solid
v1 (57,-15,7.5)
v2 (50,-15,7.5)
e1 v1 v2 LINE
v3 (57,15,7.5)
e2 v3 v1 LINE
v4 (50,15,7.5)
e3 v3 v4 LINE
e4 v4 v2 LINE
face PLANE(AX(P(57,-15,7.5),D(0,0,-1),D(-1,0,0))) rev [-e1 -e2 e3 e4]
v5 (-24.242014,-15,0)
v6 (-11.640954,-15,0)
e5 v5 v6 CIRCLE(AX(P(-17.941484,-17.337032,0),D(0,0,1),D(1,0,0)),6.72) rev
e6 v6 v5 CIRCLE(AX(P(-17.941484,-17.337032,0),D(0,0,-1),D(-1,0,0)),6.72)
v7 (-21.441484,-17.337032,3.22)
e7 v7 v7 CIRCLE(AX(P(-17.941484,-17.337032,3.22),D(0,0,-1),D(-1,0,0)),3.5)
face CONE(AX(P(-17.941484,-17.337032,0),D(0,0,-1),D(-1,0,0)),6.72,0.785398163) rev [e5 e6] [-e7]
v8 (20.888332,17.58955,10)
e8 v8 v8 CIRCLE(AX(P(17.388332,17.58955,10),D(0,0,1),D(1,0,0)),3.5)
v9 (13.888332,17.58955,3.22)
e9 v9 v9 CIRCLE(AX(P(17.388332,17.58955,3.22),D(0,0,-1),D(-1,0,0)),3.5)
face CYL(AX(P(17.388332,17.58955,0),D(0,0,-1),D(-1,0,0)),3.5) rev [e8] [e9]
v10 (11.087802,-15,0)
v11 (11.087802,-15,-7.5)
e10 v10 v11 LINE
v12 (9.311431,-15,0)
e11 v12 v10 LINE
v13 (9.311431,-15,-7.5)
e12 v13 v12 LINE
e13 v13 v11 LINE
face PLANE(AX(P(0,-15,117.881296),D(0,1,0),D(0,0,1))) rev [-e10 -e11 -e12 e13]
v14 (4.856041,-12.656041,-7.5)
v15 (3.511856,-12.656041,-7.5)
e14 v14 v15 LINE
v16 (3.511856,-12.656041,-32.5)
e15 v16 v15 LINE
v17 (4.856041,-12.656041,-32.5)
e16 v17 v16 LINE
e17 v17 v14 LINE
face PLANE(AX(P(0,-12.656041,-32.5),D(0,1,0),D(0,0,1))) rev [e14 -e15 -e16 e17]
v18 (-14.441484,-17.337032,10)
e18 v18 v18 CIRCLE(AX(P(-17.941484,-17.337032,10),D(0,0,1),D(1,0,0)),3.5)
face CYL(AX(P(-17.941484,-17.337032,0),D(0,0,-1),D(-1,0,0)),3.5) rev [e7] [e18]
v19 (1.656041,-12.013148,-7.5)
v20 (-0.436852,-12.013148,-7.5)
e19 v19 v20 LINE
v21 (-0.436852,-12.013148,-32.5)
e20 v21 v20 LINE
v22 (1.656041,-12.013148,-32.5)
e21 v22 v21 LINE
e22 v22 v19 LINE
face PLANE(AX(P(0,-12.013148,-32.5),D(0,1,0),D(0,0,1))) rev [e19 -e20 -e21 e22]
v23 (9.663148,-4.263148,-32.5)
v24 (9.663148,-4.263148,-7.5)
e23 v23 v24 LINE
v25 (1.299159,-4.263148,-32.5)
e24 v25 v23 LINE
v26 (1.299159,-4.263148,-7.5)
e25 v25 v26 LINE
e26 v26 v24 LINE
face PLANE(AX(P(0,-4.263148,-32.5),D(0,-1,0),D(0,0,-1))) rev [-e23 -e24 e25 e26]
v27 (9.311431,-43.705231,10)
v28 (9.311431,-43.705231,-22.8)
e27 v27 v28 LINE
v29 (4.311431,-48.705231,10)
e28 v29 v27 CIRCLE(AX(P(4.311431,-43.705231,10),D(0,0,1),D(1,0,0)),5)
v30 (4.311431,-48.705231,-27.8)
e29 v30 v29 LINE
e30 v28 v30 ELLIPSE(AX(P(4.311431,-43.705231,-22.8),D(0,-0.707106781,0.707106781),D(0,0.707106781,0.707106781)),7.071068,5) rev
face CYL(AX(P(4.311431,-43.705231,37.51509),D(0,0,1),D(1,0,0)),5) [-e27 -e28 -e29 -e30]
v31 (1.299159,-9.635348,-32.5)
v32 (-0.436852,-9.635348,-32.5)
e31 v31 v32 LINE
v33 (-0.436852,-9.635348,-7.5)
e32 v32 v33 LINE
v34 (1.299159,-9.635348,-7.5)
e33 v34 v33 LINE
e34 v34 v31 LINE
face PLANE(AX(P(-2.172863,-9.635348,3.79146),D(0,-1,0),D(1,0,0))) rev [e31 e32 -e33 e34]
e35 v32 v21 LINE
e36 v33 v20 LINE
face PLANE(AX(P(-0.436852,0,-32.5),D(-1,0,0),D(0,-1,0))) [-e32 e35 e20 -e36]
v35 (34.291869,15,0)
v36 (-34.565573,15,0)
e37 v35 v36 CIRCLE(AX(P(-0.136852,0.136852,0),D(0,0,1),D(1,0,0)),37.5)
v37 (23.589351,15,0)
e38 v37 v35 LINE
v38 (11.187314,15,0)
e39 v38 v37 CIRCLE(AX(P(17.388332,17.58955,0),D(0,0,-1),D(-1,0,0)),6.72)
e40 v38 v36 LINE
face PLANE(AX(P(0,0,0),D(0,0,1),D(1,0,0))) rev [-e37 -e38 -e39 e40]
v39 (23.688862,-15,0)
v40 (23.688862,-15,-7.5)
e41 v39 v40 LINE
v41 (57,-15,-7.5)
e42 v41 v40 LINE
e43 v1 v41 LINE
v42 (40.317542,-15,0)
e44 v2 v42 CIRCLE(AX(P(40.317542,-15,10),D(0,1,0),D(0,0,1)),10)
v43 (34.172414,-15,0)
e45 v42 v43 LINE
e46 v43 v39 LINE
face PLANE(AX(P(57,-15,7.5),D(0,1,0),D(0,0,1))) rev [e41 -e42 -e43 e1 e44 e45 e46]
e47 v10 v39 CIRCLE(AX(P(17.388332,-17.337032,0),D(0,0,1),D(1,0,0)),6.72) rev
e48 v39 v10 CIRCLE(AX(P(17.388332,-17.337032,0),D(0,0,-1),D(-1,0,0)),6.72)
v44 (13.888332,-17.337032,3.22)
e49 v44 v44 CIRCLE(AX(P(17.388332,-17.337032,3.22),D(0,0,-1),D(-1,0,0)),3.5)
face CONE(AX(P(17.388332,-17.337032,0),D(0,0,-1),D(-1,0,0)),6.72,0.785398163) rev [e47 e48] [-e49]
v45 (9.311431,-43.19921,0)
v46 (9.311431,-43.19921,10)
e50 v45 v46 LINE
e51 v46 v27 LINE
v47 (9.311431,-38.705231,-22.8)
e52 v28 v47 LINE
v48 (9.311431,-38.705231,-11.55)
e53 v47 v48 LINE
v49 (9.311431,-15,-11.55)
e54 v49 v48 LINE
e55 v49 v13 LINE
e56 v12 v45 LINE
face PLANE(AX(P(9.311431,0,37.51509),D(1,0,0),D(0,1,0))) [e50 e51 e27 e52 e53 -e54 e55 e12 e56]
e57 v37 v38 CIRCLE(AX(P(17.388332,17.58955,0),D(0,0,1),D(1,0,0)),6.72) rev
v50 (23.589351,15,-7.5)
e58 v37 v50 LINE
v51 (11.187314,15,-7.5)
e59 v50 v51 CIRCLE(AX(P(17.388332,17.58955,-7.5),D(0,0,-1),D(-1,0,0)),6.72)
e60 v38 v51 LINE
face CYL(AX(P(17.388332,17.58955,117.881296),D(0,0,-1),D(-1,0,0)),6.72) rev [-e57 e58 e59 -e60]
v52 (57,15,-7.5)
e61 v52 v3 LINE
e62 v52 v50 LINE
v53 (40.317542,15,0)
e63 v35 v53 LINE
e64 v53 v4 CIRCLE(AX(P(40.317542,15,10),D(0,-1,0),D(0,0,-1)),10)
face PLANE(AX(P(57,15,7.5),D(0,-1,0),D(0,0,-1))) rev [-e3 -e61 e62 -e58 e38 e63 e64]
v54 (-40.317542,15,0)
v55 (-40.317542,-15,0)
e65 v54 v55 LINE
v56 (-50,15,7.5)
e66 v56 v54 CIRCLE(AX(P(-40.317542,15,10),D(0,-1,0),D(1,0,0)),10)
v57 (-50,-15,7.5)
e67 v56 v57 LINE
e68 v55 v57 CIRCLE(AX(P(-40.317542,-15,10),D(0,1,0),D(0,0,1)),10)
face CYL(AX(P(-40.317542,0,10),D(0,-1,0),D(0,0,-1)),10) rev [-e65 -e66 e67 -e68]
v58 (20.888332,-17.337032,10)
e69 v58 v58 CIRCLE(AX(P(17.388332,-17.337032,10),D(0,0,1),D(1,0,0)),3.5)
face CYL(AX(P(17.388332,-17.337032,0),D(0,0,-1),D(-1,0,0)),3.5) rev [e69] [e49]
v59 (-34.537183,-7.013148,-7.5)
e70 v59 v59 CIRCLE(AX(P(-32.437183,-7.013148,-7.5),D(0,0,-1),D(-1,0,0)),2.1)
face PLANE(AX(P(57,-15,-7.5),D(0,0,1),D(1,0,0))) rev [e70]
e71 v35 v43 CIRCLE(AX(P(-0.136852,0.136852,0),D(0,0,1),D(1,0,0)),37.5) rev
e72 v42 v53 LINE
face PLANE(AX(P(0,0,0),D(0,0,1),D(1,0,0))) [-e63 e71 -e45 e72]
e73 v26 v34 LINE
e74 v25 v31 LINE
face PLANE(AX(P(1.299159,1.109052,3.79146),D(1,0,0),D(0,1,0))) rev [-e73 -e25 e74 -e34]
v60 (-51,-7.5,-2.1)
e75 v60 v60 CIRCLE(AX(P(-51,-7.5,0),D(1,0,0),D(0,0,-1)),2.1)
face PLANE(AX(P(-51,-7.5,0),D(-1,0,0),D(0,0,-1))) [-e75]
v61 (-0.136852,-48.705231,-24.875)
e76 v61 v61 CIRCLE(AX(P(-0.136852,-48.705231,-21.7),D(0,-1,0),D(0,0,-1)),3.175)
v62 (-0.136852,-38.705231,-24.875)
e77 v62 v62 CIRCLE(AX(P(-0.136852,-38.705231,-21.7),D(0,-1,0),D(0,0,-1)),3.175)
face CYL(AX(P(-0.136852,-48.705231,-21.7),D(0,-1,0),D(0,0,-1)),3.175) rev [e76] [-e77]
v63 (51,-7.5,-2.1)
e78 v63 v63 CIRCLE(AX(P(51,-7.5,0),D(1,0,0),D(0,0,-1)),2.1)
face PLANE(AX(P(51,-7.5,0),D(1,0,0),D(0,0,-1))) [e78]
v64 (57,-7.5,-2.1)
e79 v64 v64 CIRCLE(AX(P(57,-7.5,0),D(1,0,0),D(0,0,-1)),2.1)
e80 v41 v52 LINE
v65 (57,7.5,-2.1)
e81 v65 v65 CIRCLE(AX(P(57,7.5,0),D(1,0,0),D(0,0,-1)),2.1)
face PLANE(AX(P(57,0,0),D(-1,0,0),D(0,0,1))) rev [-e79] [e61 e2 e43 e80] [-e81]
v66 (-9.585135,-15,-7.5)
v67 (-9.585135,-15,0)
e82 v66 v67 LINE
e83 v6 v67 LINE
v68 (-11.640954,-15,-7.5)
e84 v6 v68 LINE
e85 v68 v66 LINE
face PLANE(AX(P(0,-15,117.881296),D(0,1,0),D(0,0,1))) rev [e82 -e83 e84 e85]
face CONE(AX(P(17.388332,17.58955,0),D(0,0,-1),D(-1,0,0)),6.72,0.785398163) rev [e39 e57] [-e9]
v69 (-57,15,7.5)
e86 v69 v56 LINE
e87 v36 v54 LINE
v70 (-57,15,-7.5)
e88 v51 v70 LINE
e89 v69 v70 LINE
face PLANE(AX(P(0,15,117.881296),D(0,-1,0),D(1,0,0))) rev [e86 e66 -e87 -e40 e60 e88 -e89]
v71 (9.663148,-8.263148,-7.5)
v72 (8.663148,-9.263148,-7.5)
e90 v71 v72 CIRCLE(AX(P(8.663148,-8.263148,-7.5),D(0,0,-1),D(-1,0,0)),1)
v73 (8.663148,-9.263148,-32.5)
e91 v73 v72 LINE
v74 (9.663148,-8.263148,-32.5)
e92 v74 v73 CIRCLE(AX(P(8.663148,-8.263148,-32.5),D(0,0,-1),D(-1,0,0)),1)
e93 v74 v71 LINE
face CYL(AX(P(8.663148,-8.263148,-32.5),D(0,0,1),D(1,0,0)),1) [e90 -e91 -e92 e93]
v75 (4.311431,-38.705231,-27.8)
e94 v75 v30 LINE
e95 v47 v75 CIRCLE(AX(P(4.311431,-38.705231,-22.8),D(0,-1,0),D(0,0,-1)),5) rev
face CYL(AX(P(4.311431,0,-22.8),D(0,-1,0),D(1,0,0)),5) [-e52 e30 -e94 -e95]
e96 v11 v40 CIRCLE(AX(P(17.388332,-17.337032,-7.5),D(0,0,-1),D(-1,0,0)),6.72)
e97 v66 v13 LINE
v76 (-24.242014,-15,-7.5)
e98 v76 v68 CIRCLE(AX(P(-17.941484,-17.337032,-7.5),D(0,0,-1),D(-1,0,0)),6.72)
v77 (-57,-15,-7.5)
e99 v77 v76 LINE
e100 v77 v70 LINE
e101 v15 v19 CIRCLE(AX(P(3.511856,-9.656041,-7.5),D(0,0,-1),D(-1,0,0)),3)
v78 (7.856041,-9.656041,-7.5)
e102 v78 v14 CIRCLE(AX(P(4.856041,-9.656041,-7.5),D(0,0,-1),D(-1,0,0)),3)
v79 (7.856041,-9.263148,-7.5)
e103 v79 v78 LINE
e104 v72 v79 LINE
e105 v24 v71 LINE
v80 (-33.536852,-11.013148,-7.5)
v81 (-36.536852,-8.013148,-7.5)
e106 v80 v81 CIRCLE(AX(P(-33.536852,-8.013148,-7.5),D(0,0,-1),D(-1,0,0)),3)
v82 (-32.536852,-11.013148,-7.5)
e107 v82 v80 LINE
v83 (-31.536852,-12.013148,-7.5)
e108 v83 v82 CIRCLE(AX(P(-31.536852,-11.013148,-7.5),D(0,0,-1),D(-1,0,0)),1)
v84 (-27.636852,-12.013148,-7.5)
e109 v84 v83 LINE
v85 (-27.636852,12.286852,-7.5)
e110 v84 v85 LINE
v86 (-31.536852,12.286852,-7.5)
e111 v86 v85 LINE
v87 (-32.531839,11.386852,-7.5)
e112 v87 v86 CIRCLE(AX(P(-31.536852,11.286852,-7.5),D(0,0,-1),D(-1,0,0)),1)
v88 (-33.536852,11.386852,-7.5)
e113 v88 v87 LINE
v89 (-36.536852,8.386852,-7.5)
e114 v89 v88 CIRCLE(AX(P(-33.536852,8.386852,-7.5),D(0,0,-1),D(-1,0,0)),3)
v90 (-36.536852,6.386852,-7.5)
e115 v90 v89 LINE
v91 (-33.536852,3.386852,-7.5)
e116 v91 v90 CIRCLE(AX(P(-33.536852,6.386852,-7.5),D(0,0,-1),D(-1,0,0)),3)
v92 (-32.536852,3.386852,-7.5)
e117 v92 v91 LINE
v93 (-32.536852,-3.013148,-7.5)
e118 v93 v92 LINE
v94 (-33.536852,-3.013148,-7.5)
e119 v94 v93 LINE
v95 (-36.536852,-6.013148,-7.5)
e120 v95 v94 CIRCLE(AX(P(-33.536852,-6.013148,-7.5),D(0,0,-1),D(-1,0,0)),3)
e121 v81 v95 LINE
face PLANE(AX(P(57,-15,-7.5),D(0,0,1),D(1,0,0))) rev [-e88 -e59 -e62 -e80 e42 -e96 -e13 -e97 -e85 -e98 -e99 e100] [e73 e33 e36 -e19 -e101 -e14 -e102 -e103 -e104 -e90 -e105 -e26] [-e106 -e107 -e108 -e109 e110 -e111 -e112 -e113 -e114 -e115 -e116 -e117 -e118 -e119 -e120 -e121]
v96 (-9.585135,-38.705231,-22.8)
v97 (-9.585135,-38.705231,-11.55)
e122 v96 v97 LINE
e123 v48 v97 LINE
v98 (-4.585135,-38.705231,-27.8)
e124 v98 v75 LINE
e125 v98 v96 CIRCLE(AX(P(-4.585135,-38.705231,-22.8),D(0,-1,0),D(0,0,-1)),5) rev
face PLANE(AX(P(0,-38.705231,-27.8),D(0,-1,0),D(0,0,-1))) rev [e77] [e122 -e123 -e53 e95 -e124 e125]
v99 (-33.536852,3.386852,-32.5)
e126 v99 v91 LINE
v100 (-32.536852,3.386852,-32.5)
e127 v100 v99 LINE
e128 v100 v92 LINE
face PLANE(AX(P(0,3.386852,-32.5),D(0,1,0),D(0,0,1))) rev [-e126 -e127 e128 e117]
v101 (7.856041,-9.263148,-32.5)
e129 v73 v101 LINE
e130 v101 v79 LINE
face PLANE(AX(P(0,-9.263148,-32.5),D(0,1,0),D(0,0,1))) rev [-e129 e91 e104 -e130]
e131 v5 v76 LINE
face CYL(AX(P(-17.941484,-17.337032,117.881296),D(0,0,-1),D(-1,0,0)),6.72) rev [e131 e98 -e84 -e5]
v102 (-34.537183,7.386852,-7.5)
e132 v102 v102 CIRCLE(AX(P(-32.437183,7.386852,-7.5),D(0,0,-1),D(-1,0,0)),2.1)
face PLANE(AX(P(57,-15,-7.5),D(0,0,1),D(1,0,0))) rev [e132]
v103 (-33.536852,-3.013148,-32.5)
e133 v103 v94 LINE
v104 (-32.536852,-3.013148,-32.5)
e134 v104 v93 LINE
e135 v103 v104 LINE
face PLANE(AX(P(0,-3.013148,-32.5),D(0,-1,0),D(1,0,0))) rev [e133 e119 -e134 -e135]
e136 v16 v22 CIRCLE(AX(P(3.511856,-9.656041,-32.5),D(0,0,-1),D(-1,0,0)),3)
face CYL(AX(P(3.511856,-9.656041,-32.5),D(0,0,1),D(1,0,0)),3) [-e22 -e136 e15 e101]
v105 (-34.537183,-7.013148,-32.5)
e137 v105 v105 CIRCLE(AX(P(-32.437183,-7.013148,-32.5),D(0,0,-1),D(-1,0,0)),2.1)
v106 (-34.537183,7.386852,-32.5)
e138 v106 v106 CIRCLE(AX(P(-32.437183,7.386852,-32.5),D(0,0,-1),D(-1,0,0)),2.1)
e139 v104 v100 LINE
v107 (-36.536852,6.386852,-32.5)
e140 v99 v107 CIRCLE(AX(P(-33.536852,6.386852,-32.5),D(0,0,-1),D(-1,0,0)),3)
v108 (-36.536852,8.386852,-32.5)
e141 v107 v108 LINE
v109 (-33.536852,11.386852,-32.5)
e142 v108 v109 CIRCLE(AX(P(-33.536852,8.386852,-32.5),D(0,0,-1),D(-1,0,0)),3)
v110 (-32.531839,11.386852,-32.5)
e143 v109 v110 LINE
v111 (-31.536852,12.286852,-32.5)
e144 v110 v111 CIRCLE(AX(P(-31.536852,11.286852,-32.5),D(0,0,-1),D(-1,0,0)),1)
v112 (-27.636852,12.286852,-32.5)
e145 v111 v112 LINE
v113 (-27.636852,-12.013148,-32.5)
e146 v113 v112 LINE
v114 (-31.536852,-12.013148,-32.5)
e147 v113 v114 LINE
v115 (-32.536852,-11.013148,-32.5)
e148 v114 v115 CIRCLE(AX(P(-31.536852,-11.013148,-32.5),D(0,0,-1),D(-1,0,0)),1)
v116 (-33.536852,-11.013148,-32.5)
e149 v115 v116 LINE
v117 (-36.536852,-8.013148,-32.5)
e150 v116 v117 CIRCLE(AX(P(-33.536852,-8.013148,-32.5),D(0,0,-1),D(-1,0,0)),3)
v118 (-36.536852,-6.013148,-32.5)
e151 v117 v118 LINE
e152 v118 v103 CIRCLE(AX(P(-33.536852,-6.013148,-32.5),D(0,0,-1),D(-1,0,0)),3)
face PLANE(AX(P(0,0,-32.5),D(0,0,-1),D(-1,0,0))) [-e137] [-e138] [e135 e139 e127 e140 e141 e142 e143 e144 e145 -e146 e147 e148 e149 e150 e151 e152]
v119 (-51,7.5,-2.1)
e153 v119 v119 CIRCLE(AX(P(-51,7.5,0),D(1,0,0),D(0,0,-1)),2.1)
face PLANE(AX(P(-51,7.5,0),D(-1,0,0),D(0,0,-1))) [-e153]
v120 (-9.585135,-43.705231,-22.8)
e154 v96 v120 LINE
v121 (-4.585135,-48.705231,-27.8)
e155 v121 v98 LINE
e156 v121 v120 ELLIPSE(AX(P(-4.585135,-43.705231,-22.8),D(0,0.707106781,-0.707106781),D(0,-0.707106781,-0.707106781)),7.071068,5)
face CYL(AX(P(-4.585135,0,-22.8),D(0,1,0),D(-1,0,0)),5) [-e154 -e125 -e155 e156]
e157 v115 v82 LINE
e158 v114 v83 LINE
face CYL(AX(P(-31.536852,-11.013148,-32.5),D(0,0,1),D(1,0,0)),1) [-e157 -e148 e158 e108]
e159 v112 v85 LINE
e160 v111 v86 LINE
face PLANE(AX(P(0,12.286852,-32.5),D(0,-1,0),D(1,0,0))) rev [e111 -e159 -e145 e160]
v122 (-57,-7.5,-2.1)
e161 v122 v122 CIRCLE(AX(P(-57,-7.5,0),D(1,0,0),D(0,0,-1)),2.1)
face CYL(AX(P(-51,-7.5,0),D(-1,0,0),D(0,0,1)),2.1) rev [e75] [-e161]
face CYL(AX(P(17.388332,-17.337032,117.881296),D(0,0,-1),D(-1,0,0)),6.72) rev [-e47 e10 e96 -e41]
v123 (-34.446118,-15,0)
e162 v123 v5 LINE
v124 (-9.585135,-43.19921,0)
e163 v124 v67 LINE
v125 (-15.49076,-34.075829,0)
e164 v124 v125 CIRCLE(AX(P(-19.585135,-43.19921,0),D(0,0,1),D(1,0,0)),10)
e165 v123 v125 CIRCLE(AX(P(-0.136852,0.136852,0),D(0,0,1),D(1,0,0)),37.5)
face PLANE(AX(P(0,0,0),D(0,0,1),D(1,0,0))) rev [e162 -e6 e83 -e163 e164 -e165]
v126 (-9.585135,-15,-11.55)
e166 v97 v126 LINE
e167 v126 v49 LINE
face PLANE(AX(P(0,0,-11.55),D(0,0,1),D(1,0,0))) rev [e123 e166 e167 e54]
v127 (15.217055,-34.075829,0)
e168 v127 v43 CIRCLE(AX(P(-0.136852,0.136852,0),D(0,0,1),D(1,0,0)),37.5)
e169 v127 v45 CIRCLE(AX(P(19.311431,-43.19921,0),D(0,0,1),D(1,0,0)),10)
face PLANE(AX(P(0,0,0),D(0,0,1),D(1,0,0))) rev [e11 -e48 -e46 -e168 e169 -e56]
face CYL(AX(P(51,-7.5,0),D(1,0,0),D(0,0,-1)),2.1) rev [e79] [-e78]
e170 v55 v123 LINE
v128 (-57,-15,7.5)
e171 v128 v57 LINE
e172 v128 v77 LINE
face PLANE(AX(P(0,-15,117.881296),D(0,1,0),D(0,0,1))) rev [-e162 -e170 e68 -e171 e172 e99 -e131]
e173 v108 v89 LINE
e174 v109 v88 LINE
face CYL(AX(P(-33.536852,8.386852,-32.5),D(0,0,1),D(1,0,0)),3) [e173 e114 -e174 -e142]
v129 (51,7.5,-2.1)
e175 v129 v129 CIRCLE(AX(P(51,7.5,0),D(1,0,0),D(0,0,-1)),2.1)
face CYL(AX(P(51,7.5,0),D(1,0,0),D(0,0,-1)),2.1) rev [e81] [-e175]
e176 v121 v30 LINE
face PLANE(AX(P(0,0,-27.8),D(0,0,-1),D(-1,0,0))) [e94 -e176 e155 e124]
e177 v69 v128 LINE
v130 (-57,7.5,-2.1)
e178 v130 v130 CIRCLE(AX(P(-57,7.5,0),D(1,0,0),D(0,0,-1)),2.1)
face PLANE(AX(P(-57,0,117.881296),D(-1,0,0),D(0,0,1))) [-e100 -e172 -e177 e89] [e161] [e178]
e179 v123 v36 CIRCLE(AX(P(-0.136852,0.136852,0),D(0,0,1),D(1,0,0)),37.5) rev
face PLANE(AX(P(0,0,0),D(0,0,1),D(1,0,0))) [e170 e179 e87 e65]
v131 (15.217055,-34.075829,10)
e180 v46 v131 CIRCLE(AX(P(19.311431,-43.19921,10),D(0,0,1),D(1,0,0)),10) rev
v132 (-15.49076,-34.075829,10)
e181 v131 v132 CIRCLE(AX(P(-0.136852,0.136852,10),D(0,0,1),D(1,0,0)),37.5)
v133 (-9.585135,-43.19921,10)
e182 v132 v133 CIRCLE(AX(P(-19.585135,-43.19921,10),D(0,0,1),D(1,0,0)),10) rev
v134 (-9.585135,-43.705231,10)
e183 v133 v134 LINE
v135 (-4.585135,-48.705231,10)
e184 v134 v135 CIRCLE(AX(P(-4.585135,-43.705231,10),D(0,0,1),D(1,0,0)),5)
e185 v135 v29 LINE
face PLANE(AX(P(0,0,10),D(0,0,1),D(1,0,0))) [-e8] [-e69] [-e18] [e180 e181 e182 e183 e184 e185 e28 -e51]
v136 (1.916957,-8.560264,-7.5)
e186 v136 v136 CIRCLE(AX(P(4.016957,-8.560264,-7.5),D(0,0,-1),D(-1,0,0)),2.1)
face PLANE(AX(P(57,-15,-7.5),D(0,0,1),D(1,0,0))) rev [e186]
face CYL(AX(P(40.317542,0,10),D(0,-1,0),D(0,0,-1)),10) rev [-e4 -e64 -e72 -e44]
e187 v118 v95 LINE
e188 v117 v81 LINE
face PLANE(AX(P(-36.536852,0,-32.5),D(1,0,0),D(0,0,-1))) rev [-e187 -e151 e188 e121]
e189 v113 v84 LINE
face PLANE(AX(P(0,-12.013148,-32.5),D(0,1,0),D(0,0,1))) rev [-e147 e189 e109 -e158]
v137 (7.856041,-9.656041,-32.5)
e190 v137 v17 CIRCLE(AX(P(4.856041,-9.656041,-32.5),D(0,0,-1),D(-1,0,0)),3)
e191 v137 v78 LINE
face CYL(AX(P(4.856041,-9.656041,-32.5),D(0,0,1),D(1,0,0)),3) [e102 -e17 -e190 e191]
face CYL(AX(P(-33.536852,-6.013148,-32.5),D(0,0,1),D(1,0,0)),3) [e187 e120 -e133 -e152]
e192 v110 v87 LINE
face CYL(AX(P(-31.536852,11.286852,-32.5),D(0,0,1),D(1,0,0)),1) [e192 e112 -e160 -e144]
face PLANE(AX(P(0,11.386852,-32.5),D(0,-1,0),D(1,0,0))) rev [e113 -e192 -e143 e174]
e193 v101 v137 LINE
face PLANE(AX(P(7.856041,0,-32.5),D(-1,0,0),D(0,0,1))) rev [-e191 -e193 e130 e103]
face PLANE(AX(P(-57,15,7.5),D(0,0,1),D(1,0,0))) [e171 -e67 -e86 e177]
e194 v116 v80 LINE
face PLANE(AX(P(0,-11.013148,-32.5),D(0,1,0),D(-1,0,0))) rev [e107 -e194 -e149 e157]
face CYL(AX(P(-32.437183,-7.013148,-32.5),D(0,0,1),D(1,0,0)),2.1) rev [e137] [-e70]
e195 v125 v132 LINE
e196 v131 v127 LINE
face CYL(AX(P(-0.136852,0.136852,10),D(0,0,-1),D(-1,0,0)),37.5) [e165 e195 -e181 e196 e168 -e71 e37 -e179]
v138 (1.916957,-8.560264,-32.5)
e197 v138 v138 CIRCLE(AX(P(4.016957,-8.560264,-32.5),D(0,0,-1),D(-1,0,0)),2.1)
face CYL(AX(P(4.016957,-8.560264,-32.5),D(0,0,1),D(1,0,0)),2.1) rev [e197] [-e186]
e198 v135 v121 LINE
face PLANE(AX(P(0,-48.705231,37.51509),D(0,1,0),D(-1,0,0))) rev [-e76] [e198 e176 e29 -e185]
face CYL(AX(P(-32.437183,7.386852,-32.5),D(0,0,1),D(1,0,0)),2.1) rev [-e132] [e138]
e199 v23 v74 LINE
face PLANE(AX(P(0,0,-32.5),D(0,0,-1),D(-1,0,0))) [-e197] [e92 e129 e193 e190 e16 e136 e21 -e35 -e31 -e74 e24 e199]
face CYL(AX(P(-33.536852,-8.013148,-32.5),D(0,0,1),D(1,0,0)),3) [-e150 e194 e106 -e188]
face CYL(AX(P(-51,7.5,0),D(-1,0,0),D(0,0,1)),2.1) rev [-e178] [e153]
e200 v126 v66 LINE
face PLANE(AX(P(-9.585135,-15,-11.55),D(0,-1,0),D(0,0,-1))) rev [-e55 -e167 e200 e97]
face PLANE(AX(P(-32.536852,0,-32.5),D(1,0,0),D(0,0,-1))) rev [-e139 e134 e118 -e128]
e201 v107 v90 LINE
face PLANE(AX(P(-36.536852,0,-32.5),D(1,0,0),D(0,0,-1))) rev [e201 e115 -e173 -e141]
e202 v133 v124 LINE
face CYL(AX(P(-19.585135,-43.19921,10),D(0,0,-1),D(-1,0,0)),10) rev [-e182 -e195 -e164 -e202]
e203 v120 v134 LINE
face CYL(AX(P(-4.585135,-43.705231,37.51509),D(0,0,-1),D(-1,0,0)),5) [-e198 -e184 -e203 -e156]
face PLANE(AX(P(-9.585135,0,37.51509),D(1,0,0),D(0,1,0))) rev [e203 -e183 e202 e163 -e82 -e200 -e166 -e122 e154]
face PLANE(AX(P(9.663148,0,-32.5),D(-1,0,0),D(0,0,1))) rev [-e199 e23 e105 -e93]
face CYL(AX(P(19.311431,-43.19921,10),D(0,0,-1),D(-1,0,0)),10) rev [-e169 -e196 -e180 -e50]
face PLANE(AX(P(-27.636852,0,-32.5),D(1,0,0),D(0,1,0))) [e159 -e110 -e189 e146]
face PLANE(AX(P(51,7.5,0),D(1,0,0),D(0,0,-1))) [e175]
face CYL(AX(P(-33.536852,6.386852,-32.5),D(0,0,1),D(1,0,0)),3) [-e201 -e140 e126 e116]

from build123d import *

# Parameters (mm, degrees)
SKETCH1_R                                            = 37.5
BOSS_EXTRUDE1_DEPTH                                  = 10
CSK_FOR_M6_HEX_SOCKET_COUNTERSUNK_CAP_SC_D           = 7
CSK_FOR_M6_HEX_SOCKET_COUNTERSUNK_CAP_SC_DEPTH       = 14.44
CSK_FOR_M6_HEX_SOCKET_COUNTERSUNK_CAP_SC_CSINK_D     = 13.44
CSK_FOR_M6_HEX_SOCKET_COUNTERSUNK_CAP_SC_CSINK_ANGLE = 90
CSK_FOR_M6_HEX_SOCKET_COUNTERSUNK_CAP_SC_TIP         = 2.103012167
SKETCH6_W                                            = 15
SKETCH6_H                                            = 30
BOSS_EXTRUDE2_DEPTH                                  = 7
SKETCH7_W                                            = 15
SKETCH7_H                                            = 30
BOSS_EXTRUDE3_DEPTH                                  = 7
BOSS_EXTRUDE4_START                                  = -7.5
BOSS_EXTRUDE4_DEPTH                                  = 7.5
FILLET1_R                                            = 10
SKETCH9_R                                            = 2.1
CUT_EXTRUDE1_DEPTH                                   = 6
SKETCH11_R                                           = 2.1
BOSS_EXTRUDE5_DEPTH                                  = 25
SKETCH12_W                                           = 3.472021997
SKETCH12_H                                           = 10.744400241
CUT_EXTRUDE2_DEPTH                                   = 25
BOSS_EXTRUDE7_DEPTH                                  = 10
SKETCH15_4_W                                         = 18.896565648
SKETCH15_4_H                                         = 10
BOSS_EXTRUDE8_DEPTH                                  = 27.8
F_1_4_0_25_DIAMETER_HOLE2_D                          = 6.35
F_1_4_0_25_DIAMETER_HOLE2_DEPTH                      = 15
F_1_4_0_25_DIAMETER_HOLE2_TIP                        = 1.907732465
SKETCH24_W                                           = 18.896565648
SKETCH24_H                                           = 23.705231447
BOSS_EXTRUDE9_DEPTH                                  = 11.55
FILLET2_R                                            = 10
FILLET4_R                                            = 5


with BuildPart() as part:
    # Sketch1 → Boss-Extrude1 (new body)
    with BuildSketch(Plane.XY):
        with Locations((-0.136852044, 0.136852044)):
            Circle(SKETCH1_R)
    extrude(amount=BOSS_EXTRUDE1_DEPTH)

    # CSK for M6 Hex Socket Countersunk Cap Screw1
    with Locations(Plane(origin=(0, 0, 0), x_dir=(-1, 0, 0), z_dir=(0, 0, -1))):
        with Locations((-17.388332087, 17.58954996), (-17.388332087, -17.337031875), (17.941484165, -17.337031875)):
            CounterSinkHole(CSK_FOR_M6_HEX_SOCKET_COUNTERSUNK_CAP_SC_D / 2, CSK_FOR_M6_HEX_SOCKET_COUNTERSUNK_CAP_SC_CSINK_D / 2, depth=CSK_FOR_M6_HEX_SOCKET_COUNTERSUNK_CAP_SC_DEPTH, counter_sink_angle=CSK_FOR_M6_HEX_SOCKET_COUNTERSUNK_CAP_SC_CSINK_ANGLE)
            with Locations((0, 0, -(CSK_FOR_M6_HEX_SOCKET_COUNTERSUNK_CAP_SC_DEPTH + CSK_FOR_M6_HEX_SOCKET_COUNTERSUNK_CAP_SC_TIP / 2))):  # 118° drill point
                Cone(0, CSK_FOR_M6_HEX_SOCKET_COUNTERSUNK_CAP_SC_D / 2, CSK_FOR_M6_HEX_SOCKET_COUNTERSUNK_CAP_SC_TIP, mode=Mode.SUBTRACT)



with BuildPart() as body_2:
    # Sketch6 → Boss-Extrude2 (new body)
    with BuildSketch(Plane(origin=(50, 0, 0), x_dir=(0, 0, -1), z_dir=(1, 0, 0))):
        Rectangle(SKETCH6_W, SKETCH6_H)
    extrude(amount=BOSS_EXTRUDE2_DEPTH)


with BuildPart() as body_3:
    # Sketch7 → Boss-Extrude3 (new body)
    with BuildSketch(Plane(origin=(-50, 0, 0), x_dir=(0, 0, -1), z_dir=(1, 0, 0))):
        Rectangle(SKETCH7_W, SKETCH7_H)
    extrude(amount=-BOSS_EXTRUDE3_DEPTH)


with BuildPart() as part_1:
    add(part.part)

    add(body_2.part)  # Boss-Extrude4 merges body 2

    add(body_3.part)  # Boss-Extrude4 merges body 3
    # Sketch8 → Boss-Extrude4 (add)
    with BuildSketch(Plane(origin=(0, 0, -7.5), x_dir=(-1, 0, 0), z_dir=(0, 0, -1)).offset(BOSS_EXTRUDE4_START)):
        with BuildLine():
            Line((-34.291869002, 15), (-57, 15))
            Line((-57, 15), (-57, -15))
            Line((-57, -15), (-34.172413618, -15))
            Line((-34.172413618, -15), (-23.688862383, -15))
            ThreePointArc((-23.688862383, -15), (-17.388332087, -10.617031875), (-11.087801791, -15))
            Line((-11.087801791, -15), (11.640953869, -15))
            ThreePointArc((11.640953869, -15), (17.941484165, -10.617031875), (24.242014462, -15))
            Line((24.242014462, -15), (34.446117705, -15))
            Line((34.446117705, -15), (57, -15))
            Line((57, -15), (57, 15))
            Line((57, 15), (34.565573089, 15))
            Line((34.565573089, 15), (24.142502711, 15))
            Line((24.142502711, 15), (11.74046562, 15))
            Line((11.74046562, 15), (-11.187313541, 15))
            ThreePointArc((-11.187313541, 15), (-17.388332087, 10.86954996), (-23.589350633, 15))
            Line((-23.589350633, 15), (-34.291869002, 15))
        make_face()
    extrude(amount=BOSS_EXTRUDE4_DEPTH)

    # Fillet1
    # the kernel refuses this fillet: 10 mm, written as the material it adds along each edge
    with BuildSketch(Plane(origin=(-50, -15, 0), x_dir=(0, 0, 1), z_dir=(0, 1, 0))) as fillet1_piece_1:
        with BuildLine():
            CenterArc((10, 9.682458366), FILLET1_R, 180, 75.522487814)
            Line((0, 9.682458366), (-0.2, 9.682458366))
            Line((-0.2, 9.682458366), (-0.2, 0))
            Line((-0.2, 0), (0, -0.2))
            ThreePointArc((0, -0.2), (3.75, -0.2), (7.45, -0.193649167))
            Line((7.45, -0.193649167), (7.5, 0))
        make_face()
    extrude(amount=30)
    with BuildSketch(Plane(origin=(50, -15, 0), x_dir=(0, 0, 1), z_dir=(0, 1, 0))) as fillet1_piece_2:
        with BuildLine():
            CenterArc((10, -9.682458366), FILLET1_R, 104.477512186, 75.522487814)
            Line((0, -9.682458366), (-0.2, -9.682458366))
            Line((-0.2, -9.682458366), (-0.2, 0))
            Line((-0.2, 0), (0, 0.2))
            ThreePointArc((0, 0.2), (3.75, 0.2), (7.45, 0.193649167))
            Line((7.45, 0.193649167), (7.5, 0))
        make_face()
    extrude(amount=30)

    # Sketch9 → Cut-Extrude1 (cut)
    with BuildSketch(Plane(origin=(57, 0, 0), x_dir=(0, 0, -1), z_dir=(1, 0, 0))):
        with Locations((0, -7.5)):
            Circle(SKETCH9_R)
        with Locations((0, 7.5)):
            Circle(SKETCH9_R)
    cut_extrude1 = extrude(amount=-CUT_EXTRUDE1_DEPTH, mode=Mode.SUBTRACT)

    # Mirror1: Cut-Extrude1 across plane
    add(cut_extrude1.mirror(Plane(origin=(0, 0, 0), x_dir=(0, 0, 1), z_dir=(1, 0, 0))), mode=Mode.SUBTRACT)

    # Sketch11 → Boss-Extrude5 (add)
    # profile 1 of 2: a face of its own
    with BuildSketch(Plane(origin=(0, 0, -7.5), x_dir=(-1, 0, 0), z_dir=(0, 0, -1))):
        with BuildLine():
            Line((27.636852044, 12.286852044), (27.636852044, -12.013147956))
            Line((27.636852044, -12.013147956), (31.536852044, -12.013147956))
            ThreePointArc((31.536852044, -12.013147956), (32.243958825, -11.720254738), (32.536852044, -11.013147956))
            Line((32.536852044, -11.013147956), (33.536852044, -11.013147956))
            ThreePointArc((33.536852044, -11.013147956), (35.658172387, -10.1344683), (36.536852044, -8.013147956))
            Line((36.536852044, -8.013147956), (36.536852044, -6.013147956))
            ThreePointArc((36.536852044, -6.013147956), (35.658172387, -3.891827613), (33.536852044, -3.013147956))
            Line((33.536852044, -3.013147956), (32.536852044, -3.013147956))
            Line((32.536852044, -3.013147956), (32.536852044, 3.386852044))
            Line((32.536852044, 3.386852044), (33.536852044, 3.386852044))
            ThreePointArc((33.536852044, 3.386852044), (35.658172387, 4.2655317), (36.536852044, 6.386852044))
            Line((36.536852044, 6.386852044), (36.536852044, 8.386852044))
            ThreePointArc((36.536852044, 8.386852044), (35.658172387, 10.508172387), (33.536852044, 11.386852044))
            Line((33.536852044, 11.386852044), (32.531839481, 11.386852044))
            ThreePointArc((32.531839481, 11.386852044), (32.207672437, 12.028471892), (31.536852044, 12.286852044))
            Line((31.536852044, 12.286852044), (27.636852044, 12.286852044))
        make_face()
        with Locations((32.437183431, -7.013147956)):
            Circle(SKETCH11_R, mode=Mode.SUBTRACT)
        with Locations((32.437183431, 7.386852044)):
            Circle(SKETCH11_R, mode=Mode.SUBTRACT)
    # profile 2 of 2: a face of its own
    with BuildSketch(Plane(origin=(0, 0, -7.5), x_dir=(-1, 0, 0), z_dir=(0, 0, -1))):
        with BuildLine():
            Line((0.436852044, -12.013147956), (0.436852044, -4.263147956))
            Line((0.436852044, -4.263147956), (-9.663147956, -4.263147956))
            Line((-9.663147956, -4.263147956), (-9.663147956, -8.263147956))
            ThreePointArc((-9.663147956, -8.263147956), (-9.370254738, -8.970254738), (-8.663147956, -9.263147956))
            Line((-8.663147956, -9.263147956), (-7.856041175, -9.263147956))
            Line((-7.856041175, -9.263147956), (-7.856041175, -9.656041175))
            ThreePointArc((-7.856041175, -9.656041175), (-6.977361519, -11.777361519), (-4.856041175, -12.656041175))
            Line((-4.856041175, -12.656041175), (-3.511855719, -12.656041175))
            ThreePointArc((-3.511855719, -12.656041175), (-2.52984766, -12.490765178), (-1.656041175, -12.013147956))
            Line((-1.656041175, -12.013147956), (0.436852044, -12.013147956))
        make_face()
        with Locations((-4.016957243, -8.560264433)):
            Circle(SKETCH11_R, mode=Mode.SUBTRACT)
    extrude(amount=BOSS_EXTRUDE5_DEPTH)

    # Sketch12 → Cut-Extrude2 (cut)
    with BuildSketch(Plane(origin=(0, 0, -32.5), x_dir=(-1, 0, 0), z_dir=(0, 0, -1))):
        with Locations((0.436852044, -4.263147957)):
            Rectangle(SKETCH12_W, SKETCH12_H)
    extrude(amount=-CUT_EXTRUDE2_DEPTH, mode=Mode.SUBTRACT)

    # Sketch15 → Boss-Extrude7 (add)
    with BuildSketch(Plane(origin=(0, 0, 0), x_dir=(-1, 0, 0), z_dir=(0, 0, -1))):
        with BuildLine():
            ThreePointArc((9.585134895, -36.153366351), (0.136852072, -37.363147956), (-9.311430753, -36.153366366))
            Line((-9.311430753, -36.153366366), (-9.311430753, -48.705231447))
            Line((-9.311430753, -48.705231447), (9.585134895, -48.705231447))
            Line((9.585134895, -48.705231447), (9.585134895, -36.153366351))
        make_face()
    extrude(amount=-BOSS_EXTRUDE7_DEPTH)

    # Sketch15<4> → Boss-Extrude8 (add)
    with BuildSketch(Plane(origin=(0, 0, 0), x_dir=(-1, 0, 0), z_dir=(0, 0, -1))):
        with Locations((0.136852071, -43.705231447)):
            Rectangle(SKETCH15_4_W, SKETCH15_4_H)
    extrude(amount=BOSS_EXTRUDE8_DEPTH)

    # 1/4 (0.25) Diameter Hole2
    with Locations(Plane(origin=(0, -48.705231447, 0), x_dir=(-1, 0, 0), z_dir=(0, -1, 0))):
        with Locations((0.136852046, 21.7)):
            Hole(F_1_4_0_25_DIAMETER_HOLE2_D / 2, depth=F_1_4_0_25_DIAMETER_HOLE2_DEPTH)
            with Locations((0, 0, -(F_1_4_0_25_DIAMETER_HOLE2_DEPTH + F_1_4_0_25_DIAMETER_HOLE2_TIP / 2))):  # 118° drill point
                Cone(0, F_1_4_0_25_DIAMETER_HOLE2_D / 2, F_1_4_0_25_DIAMETER_HOLE2_TIP, mode=Mode.SUBTRACT)

    # Sketch24 → Boss-Extrude9 (add)
    with BuildSketch(Plane(origin=(0, 0, 0), x_dir=(-1, 0, 0), z_dir=(0, 0, -1))):
        with Locations((0.136852071, -26.852615724)):
            Rectangle(SKETCH24_W, SKETCH24_H)
    extrude(amount=BOSS_EXTRUDE9_DEPTH)

    # Fillet2
    fillet2_edges = [part_1.edges().sort_by_distance(p)[0] for p in [
        (-9.585134895, -36.153366351, 5),
        (9.311430753, -36.153366366, 5),
    ]]
    fillet(fillet2_edges, radius=FILLET2_R)

    # Fillet4
    fillet4_edges = [part_1.edges().sort_by_distance(p)[0] for p in [
        (9.311430753, -48.705231447, -8.9),
        (-9.585134895, -48.705231447, -8.9),
        (-9.585134895, -43.705231447, -27.8),
        (9.311430753, -43.705231447, -27.8),
    ]]
    fillet(fillet4_edges, radius=FILLET4_R)


solid = part_1.part
